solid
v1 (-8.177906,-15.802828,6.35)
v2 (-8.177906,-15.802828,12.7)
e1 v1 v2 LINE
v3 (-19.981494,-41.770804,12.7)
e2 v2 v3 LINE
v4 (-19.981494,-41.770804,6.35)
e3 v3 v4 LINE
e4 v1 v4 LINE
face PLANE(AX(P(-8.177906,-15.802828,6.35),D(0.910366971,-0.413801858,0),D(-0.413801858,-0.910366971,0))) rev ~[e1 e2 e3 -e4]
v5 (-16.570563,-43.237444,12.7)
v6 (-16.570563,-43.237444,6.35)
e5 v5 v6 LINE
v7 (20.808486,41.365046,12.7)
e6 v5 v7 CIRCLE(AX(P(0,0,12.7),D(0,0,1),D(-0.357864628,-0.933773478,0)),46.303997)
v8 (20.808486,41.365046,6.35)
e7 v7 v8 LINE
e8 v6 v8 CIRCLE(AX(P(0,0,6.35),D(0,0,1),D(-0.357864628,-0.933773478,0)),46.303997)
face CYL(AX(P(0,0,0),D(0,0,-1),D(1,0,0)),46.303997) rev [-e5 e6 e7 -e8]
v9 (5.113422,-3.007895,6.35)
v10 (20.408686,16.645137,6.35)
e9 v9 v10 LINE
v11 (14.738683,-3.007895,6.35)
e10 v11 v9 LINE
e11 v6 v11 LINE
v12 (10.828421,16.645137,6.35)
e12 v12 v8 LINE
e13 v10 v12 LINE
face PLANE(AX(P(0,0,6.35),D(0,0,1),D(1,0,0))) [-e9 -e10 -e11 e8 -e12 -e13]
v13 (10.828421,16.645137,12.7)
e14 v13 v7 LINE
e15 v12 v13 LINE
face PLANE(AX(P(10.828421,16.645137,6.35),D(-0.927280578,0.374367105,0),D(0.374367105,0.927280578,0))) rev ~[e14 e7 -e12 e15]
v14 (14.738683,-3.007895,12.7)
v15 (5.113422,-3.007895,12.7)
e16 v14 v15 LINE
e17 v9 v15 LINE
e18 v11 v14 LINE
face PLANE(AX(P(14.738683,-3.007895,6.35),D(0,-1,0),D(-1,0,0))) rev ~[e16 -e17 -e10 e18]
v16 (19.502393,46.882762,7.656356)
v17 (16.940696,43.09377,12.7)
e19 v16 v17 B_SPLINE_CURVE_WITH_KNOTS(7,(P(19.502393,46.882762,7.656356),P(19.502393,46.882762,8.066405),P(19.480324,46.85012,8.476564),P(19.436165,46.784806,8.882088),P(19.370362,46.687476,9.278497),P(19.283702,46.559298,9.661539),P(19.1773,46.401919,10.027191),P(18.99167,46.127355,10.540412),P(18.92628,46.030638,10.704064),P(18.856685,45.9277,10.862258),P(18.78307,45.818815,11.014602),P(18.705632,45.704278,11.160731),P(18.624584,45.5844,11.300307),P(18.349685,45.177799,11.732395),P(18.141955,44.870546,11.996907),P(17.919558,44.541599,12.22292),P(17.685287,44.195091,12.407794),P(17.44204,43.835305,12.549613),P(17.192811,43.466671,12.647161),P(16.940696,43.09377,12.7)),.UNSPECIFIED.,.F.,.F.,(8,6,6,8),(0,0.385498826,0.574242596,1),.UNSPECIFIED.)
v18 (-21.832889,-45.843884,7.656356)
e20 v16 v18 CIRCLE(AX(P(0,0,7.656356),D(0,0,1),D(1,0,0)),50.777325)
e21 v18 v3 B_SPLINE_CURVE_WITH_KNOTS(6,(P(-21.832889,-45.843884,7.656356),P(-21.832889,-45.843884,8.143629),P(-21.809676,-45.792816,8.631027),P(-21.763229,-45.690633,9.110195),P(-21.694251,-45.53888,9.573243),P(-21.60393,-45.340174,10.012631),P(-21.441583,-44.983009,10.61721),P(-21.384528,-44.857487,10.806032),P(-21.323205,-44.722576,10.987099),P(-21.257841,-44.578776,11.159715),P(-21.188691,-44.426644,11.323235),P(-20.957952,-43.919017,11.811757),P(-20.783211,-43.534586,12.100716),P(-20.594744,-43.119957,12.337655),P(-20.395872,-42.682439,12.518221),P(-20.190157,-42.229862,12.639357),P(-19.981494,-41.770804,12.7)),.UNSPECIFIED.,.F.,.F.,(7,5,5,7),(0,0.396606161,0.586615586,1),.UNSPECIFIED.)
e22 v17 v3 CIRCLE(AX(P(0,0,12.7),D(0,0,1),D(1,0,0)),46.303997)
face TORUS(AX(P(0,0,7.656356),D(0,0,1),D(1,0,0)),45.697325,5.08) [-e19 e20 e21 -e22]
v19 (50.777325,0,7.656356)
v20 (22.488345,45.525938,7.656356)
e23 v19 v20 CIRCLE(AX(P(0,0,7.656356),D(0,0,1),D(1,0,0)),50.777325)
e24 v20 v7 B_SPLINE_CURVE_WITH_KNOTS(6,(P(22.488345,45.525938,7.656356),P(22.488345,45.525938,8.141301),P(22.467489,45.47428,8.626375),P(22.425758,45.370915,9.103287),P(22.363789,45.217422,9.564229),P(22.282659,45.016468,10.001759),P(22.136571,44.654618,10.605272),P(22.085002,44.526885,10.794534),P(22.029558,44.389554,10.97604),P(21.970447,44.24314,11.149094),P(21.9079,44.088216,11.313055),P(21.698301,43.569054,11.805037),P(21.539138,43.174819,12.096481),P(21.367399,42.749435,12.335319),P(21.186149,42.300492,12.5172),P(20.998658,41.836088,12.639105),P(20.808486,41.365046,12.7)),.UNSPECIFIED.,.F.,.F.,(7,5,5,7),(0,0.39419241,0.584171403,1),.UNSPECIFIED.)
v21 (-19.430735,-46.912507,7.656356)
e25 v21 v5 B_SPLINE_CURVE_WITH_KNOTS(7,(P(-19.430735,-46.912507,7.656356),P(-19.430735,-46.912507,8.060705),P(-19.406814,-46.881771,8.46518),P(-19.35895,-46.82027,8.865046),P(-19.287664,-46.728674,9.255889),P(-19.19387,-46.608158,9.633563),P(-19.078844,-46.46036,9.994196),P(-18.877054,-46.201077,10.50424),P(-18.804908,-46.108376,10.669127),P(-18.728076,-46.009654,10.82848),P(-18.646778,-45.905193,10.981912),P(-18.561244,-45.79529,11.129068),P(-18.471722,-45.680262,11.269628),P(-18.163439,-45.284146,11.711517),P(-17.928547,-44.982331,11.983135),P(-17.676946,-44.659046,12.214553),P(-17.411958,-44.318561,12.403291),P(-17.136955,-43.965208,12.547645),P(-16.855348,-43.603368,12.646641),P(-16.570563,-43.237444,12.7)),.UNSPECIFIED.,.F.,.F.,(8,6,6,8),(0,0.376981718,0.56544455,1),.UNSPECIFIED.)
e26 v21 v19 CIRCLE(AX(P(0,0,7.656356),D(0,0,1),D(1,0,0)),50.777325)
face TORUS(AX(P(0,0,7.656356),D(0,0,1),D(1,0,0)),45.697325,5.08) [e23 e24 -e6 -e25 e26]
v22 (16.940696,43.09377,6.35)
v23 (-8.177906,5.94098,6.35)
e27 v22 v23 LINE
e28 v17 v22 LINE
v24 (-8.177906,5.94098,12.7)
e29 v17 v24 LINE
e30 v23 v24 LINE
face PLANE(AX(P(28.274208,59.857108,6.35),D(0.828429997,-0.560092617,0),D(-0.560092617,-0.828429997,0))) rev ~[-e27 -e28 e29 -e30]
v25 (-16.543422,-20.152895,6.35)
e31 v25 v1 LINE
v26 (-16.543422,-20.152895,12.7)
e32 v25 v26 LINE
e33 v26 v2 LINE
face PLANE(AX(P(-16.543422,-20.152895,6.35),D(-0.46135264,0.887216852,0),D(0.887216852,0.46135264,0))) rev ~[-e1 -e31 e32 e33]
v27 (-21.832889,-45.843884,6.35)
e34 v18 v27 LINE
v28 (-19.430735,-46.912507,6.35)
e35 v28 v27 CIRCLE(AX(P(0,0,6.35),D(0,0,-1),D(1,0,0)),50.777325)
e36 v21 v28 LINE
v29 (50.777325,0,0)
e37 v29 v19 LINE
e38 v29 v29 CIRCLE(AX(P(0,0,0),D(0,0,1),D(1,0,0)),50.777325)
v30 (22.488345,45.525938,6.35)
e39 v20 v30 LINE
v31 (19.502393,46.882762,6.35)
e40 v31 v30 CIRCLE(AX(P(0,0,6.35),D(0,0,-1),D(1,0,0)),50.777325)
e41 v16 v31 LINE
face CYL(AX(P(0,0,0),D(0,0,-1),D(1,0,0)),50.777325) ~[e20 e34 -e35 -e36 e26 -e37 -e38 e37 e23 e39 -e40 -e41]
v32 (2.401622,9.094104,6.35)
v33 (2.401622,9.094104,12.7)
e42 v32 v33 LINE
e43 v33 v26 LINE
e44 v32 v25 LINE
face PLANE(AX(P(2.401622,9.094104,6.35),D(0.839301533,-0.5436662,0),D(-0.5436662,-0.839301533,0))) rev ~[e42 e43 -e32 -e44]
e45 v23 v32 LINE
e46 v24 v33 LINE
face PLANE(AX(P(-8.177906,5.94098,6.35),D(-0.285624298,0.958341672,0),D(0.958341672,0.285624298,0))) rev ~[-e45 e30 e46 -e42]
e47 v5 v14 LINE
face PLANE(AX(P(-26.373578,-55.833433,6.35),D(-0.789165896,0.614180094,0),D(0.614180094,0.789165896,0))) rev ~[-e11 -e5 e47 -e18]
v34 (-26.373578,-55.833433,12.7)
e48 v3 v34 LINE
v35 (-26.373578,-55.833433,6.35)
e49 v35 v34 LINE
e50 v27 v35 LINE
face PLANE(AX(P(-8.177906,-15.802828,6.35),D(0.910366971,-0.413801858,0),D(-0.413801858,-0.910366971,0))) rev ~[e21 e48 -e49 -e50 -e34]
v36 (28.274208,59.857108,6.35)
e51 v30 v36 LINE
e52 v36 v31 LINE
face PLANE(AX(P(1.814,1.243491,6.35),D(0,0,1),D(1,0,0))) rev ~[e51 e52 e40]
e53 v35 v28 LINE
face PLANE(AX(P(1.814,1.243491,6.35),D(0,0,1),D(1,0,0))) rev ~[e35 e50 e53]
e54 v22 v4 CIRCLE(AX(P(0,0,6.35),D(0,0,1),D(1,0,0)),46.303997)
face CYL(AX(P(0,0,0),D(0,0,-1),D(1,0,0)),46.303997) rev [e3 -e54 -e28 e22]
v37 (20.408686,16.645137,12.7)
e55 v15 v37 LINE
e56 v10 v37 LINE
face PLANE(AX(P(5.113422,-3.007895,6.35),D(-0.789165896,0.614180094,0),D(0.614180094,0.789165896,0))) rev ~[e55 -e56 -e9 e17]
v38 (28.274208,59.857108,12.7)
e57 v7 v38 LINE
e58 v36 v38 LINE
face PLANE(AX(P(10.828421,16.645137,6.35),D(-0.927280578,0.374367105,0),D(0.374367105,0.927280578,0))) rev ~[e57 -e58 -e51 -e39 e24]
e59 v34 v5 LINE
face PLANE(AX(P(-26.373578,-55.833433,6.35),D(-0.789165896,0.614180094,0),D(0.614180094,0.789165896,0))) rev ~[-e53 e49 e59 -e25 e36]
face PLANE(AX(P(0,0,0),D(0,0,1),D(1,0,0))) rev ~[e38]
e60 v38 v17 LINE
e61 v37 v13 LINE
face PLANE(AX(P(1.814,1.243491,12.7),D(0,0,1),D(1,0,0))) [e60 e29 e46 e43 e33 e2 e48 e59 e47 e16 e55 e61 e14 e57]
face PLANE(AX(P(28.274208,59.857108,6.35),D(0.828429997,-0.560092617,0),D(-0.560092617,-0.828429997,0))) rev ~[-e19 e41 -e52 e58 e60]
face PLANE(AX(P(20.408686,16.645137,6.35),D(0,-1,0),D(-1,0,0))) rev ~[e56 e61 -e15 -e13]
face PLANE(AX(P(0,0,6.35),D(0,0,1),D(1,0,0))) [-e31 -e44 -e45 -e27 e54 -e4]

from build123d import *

# Parameters (mm, degrees)
F0_R     = 46.303997109
F1_DEPTH = 6.35
F0_R_2   = 50.7773250867
F2_DEPTH = 12.7
F5_DEPTH = 6.35


# Not quite as in the source:
# - a fillet or chamfer that OpenCascade refuses, or shapes differently, is made with other operations: its cross-section is extruded or revolved along the edge and cut away or added


with BuildPart() as f1:
    # F0 (on Top) → F1 (new body)
    with BuildSketch(Plane.XY):
        Circle(F0_R)
    extrude(amount=F1_DEPTH)

    # F0 (on Top) → F2 (join)
    with BuildSketch(Plane.XY):
        Circle(F0_R_2)
        Circle(F0_R, mode=Mode.SUBTRACT)
    extrude(amount=F2_DEPTH)

    # F3: fillet of radius 5.08 on 1 edges, made by hand

    # F3_s1 → F3_t2 (revolve, cut)
    with BuildSketch(Plane.XZ):
        with BuildLine():
            ThreePointArc((50.7773250867, 7.6563555778), (49.4978706971, 11.0271497073), (46.303997109, 12.7))
            Line((46.303997109, 12.7), (46.3161305494, 12.8008728884))
            ThreePointArc((46.3161305494, 12.8008728884), (48.5406610978, 12.8016), (50.7773250867, 12.8016))
            Line((50.7773250867, 12.8016), (50.8789250867, 12.7))
            Line((50.8789250867, 12.7), (50.8789250867, 7.6563555778))
            Line((50.8789250867, 7.6563555778), (50.7773250867, 7.6563555778))
        make_face()
    revolve(axis=Axis((0, 0, 12.7), (0, 0, 1)), mode=Mode.SUBTRACT)

    # F4 (on face) → F5 (join)
    with BuildSketch(Plane.XY.offset(6.35)):
        Polygon((-8.1779062748, -15.8028278183), (-26.3735784938, -55.8334334653), (14.7386826575, -3.0078946147), (5.1134219393, -3.0078946147), (20.4086864271, 16.6451374931), (10.8284205198, 16.6451374931), (28.2742083073, 59.8571076989), (-8.1779062748, 5.9409798123), (2.4016224779, 9.0941041708), (-16.5434218943, -20.15289478), align=None)
    extrude(amount=F5_DEPTH)


solid = f1.part
